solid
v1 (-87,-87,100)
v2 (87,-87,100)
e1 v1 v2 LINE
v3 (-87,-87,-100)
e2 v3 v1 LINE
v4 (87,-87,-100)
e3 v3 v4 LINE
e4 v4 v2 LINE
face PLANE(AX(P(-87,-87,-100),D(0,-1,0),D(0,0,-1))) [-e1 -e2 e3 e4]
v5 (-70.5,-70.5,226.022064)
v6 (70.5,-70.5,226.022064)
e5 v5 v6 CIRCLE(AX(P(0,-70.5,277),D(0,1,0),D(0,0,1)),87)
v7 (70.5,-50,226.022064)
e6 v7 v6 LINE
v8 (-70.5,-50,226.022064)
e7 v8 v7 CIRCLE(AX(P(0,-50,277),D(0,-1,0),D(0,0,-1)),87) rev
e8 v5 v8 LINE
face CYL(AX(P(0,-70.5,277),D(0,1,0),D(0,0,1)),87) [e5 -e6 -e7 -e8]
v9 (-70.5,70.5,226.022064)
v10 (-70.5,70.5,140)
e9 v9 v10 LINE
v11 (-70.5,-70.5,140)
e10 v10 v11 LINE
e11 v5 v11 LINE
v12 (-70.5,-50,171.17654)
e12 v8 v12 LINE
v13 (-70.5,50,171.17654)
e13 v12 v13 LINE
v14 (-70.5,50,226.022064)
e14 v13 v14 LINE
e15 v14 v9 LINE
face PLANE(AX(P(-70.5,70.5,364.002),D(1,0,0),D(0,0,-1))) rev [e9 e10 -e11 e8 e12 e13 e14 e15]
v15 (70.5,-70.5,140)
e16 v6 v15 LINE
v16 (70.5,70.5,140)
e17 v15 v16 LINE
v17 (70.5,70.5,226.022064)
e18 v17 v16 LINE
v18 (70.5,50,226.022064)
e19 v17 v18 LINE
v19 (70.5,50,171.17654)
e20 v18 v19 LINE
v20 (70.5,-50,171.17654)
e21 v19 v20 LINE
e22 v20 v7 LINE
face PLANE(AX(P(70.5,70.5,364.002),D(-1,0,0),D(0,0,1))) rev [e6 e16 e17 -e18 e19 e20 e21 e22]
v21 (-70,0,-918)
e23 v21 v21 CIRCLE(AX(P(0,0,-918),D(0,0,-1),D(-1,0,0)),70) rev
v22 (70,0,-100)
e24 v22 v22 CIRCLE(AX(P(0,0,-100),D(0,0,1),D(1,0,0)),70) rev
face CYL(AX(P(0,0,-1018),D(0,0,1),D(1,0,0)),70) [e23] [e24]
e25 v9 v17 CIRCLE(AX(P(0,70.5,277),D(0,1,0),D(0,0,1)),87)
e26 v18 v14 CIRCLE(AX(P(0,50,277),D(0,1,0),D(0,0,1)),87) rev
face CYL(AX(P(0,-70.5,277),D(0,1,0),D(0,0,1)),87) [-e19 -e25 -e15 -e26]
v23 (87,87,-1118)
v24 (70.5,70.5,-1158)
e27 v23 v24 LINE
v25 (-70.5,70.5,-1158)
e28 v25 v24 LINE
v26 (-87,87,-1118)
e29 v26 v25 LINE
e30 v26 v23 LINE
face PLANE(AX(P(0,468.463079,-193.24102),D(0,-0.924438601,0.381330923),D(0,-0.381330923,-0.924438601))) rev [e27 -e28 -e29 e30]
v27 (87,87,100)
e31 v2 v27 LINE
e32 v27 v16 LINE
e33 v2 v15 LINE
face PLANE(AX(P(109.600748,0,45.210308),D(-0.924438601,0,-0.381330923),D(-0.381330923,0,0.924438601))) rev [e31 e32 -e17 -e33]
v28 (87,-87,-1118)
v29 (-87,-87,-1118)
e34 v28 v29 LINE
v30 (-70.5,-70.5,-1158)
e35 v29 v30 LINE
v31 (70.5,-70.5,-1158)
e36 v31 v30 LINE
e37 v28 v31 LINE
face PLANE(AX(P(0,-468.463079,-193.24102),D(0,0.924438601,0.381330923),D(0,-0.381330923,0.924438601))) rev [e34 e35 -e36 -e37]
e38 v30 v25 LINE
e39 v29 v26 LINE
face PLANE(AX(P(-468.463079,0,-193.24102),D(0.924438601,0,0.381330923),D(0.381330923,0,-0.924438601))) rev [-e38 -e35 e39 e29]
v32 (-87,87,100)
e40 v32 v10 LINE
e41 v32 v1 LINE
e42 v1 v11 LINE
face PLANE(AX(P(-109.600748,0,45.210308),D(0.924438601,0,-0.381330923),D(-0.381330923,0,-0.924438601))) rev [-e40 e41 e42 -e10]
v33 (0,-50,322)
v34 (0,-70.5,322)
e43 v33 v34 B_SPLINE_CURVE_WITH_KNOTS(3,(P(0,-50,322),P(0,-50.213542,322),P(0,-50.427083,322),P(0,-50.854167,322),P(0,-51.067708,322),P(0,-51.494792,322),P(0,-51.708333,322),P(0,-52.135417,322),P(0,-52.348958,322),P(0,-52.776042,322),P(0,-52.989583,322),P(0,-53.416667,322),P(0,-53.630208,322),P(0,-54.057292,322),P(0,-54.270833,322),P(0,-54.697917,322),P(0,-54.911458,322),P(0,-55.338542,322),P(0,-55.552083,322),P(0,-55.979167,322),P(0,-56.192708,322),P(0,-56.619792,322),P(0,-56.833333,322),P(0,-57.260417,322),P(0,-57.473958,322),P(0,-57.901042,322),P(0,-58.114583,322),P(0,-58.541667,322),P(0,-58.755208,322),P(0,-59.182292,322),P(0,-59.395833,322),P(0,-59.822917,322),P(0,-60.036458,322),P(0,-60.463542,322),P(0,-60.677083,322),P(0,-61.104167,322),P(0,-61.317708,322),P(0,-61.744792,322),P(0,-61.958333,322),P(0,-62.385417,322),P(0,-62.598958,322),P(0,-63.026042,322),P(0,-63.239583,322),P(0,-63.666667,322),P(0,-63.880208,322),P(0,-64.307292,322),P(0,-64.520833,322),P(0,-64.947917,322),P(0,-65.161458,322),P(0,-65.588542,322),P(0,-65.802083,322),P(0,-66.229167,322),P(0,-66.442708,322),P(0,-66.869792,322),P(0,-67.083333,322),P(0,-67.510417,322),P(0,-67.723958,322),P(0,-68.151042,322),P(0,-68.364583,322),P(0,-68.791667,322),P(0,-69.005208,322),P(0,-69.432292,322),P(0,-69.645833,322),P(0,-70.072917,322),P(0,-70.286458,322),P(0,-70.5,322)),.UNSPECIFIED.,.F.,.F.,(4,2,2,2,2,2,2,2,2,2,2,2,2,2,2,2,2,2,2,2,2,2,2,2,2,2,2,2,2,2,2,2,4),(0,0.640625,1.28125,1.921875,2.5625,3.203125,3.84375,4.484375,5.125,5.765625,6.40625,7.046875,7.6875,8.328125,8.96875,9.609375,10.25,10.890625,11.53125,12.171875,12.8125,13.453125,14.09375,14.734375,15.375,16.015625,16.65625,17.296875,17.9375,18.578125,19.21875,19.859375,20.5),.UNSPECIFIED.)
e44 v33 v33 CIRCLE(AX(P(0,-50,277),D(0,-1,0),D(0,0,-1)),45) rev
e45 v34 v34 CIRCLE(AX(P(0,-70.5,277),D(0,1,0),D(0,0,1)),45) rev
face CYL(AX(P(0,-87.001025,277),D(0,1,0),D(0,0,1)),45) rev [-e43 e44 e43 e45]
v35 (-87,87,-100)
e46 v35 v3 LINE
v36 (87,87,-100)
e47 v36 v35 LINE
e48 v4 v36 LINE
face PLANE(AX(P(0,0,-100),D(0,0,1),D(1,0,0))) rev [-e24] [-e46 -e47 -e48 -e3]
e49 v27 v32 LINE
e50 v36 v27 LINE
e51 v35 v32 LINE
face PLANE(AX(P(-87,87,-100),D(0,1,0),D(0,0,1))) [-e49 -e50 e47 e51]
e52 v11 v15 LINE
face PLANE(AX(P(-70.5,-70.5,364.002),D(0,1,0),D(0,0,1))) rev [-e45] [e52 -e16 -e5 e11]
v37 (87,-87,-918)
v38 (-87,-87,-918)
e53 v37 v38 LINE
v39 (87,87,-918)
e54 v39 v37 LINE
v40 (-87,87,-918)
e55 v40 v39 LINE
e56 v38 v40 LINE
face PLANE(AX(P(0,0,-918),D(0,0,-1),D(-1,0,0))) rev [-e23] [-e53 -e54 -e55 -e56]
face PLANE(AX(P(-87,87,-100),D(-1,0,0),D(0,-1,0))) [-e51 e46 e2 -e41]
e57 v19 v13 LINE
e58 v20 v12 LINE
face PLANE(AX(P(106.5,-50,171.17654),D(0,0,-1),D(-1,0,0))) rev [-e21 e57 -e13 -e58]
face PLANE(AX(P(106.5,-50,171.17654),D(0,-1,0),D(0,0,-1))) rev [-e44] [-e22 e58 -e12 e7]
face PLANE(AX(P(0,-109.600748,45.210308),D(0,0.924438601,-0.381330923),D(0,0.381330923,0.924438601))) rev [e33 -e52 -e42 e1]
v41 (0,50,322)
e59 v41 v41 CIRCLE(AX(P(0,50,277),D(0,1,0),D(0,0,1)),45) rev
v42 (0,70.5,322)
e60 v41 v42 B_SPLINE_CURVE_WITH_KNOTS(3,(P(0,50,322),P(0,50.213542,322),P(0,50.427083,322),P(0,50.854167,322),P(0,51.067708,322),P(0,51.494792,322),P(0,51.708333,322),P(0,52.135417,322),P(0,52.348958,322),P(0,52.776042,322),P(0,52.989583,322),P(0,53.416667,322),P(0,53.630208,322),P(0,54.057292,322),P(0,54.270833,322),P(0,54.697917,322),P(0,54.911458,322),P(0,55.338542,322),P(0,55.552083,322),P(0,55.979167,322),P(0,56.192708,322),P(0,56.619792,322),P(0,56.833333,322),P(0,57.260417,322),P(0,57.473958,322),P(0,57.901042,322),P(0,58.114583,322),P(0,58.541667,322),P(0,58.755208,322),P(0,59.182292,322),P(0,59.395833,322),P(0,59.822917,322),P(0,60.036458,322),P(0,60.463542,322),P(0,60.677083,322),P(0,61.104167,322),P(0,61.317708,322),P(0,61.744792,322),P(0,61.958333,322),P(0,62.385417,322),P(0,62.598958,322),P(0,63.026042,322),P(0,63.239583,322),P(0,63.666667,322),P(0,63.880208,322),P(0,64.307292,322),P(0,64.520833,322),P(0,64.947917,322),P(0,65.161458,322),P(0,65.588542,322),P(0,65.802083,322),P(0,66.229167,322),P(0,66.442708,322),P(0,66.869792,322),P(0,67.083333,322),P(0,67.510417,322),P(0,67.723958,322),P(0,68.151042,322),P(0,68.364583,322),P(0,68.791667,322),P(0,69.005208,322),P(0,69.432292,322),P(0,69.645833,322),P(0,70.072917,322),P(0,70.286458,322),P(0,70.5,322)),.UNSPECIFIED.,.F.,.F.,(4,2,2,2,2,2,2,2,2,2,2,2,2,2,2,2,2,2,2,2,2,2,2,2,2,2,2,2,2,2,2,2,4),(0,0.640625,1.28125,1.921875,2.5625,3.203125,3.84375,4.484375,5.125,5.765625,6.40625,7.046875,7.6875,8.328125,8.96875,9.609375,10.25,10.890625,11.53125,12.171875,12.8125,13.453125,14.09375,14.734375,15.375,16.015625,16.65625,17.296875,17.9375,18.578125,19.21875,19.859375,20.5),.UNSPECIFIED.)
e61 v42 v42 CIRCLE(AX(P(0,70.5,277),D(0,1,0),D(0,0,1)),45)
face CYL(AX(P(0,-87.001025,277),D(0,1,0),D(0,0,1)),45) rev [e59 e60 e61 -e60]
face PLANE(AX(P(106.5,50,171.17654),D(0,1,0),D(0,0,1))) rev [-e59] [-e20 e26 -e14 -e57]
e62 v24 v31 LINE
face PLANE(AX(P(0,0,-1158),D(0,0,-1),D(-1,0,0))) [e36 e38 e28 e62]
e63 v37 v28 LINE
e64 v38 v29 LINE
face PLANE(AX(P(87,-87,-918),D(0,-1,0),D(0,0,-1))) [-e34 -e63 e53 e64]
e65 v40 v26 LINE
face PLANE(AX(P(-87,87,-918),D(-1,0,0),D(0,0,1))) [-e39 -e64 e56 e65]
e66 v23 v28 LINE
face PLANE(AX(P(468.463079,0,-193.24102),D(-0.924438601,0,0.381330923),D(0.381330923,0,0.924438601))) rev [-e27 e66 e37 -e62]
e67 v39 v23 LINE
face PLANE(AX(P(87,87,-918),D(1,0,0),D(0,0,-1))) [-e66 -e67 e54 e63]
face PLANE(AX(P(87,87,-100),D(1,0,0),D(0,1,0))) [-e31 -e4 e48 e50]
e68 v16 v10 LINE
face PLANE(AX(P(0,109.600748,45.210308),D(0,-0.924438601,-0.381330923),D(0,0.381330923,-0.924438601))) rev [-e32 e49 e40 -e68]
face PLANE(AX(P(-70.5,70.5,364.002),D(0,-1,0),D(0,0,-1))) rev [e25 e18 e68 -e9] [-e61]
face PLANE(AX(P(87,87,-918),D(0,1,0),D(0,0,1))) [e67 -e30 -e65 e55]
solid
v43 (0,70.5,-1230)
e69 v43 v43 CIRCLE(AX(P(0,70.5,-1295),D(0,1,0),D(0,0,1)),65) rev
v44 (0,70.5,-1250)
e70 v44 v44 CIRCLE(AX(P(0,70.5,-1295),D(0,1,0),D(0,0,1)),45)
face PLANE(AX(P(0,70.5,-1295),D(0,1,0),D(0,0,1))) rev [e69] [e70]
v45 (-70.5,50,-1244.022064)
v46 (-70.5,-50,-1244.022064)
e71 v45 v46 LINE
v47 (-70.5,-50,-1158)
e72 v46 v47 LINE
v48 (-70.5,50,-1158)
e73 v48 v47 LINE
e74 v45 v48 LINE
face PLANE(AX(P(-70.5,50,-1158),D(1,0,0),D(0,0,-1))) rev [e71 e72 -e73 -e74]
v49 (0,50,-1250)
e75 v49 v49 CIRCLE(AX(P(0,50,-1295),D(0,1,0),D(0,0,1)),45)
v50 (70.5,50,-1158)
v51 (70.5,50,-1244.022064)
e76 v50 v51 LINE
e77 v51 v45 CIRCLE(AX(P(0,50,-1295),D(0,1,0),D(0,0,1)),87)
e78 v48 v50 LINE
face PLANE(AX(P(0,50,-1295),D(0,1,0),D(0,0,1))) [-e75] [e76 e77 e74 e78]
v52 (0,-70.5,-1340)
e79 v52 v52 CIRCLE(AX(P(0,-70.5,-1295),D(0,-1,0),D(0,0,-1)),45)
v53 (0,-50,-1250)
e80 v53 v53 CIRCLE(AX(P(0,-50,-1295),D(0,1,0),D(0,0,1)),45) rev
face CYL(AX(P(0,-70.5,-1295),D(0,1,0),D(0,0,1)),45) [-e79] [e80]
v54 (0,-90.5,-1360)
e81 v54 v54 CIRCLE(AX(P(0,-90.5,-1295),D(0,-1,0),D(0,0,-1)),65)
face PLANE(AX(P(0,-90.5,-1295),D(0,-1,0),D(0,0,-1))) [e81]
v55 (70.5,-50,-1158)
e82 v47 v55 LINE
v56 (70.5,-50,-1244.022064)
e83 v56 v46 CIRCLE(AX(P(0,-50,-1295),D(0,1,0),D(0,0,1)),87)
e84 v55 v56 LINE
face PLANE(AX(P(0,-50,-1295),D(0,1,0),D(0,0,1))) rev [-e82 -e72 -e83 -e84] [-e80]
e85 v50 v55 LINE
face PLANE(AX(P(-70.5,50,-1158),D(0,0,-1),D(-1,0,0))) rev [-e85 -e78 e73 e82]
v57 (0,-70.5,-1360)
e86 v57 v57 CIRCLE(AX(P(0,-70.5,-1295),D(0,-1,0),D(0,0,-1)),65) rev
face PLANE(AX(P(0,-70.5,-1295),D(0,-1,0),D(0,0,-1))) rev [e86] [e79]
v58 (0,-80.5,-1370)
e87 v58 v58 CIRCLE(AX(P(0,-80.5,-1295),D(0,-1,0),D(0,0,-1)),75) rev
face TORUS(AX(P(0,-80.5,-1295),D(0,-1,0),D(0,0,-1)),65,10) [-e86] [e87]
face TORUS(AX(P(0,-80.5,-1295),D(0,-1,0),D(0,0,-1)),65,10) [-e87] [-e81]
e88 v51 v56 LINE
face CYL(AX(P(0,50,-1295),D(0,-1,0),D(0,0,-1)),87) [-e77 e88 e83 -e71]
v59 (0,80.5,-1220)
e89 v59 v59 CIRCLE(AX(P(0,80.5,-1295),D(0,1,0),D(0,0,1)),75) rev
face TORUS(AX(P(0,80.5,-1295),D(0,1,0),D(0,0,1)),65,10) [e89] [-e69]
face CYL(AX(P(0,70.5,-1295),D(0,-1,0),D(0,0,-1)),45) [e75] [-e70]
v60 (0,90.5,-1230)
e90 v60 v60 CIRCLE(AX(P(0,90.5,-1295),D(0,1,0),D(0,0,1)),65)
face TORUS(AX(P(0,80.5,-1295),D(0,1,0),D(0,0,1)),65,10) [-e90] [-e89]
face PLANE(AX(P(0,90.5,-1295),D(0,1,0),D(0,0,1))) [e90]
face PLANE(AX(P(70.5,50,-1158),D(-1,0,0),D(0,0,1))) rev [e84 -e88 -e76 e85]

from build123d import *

# Parameters (mm, degrees)
SKETCH2_R                = 70
BOSS_EXTRUDE2_DEPTH      = 1018
SKETCH4_W                = 174
SKETCH4_H                = 174
BOSS_EXTRUDE3_DEPTH      = 100
SKETCH7_W                = 174
SKETCH7_H                = 174
BOSS_EXTRUDE4_DEPTH      = 100
SKETCH14_R               = 87
BOSS_EXTRUDE5_DEPTH      = 141
SKETCH16_R               = 45
CUT_EXTRUDE1_DEPTH       = 141
BOSS_EXTRUDE6_REACH      = 1305.818
BOSS_EXTRUDE6_END_RADIUS = 87
SKETCH17_W               = 141
SKETCH17_H               = 141
SKETCH23_W               = 196.221845396
SKETCH23_H               = 100
CUT_EXTRUDE2_DEPTH       = 201
BOSS_EXTRUDE7_DEPTH      = 50
SKETCH26_R               = 45
BOSS_EXTRUDE8_DEPTH      = 20.5
SKETCH27_R               = 45
BOSS_EXTRUDE9_DEPTH      = 20.5
SKETCH28_R               = 75
BOSS_EXTRUDE10_DEPTH     = 20
FILLET1_R                = 10
SKETCH29_R               = 75
BOSS_EXTRUDE11_DEPTH     = 20
FILLET2_R                = 10


with BuildPart() as part:
    # Sketch2 → Boss-Extrude2 (new body)
    with BuildSketch(Plane.XY):
        Circle(SKETCH2_R)
    extrude(amount=-BOSS_EXTRUDE2_DEPTH)

    # Sketch4 → Boss-Extrude3 (add, symmetric)
    with BuildSketch(Plane.XY):
        Rectangle(SKETCH4_W, SKETCH4_H)
    extrude(amount=BOSS_EXTRUDE3_DEPTH, both=True)

    # Sketch7 → Boss-Extrude4 (add, symmetric)
    with BuildSketch(Plane(origin=(0, 0, -1018), x_dir=(-1, 0, 0), z_dir=(0, 0, -1))):
        Rectangle(SKETCH7_W, SKETCH7_H)
    extrude(amount=BOSS_EXTRUDE4_DEPTH, both=True)

    # Sketch8 → section 1 of loft1
    with BuildSketch(Plane.XY.offset(140), mode=Mode.PRIVATE) as loft1_s1:
        with BuildLine():
            Line((-70.5, 70.5), (70.5, 70.5))
            Line((70.5, 70.5), (70.5, -70.5))
            Line((70.5, -70.5), (-70.5, -70.5))
            Line((-70.5, -70.5), (-70.5, 70.5))
        make_face()
    # loft from a face of the part (loft1)
    loft([part.faces().sort_by_distance((0, 0, 100))[0], loft1_s1.sketch])

    # Sketch10 → section 1 of loft8
    with BuildSketch(Plane(origin=(0, 0, -1158), x_dir=(-1, 0, 0), z_dir=(0, 0, -1)), mode=Mode.PRIVATE) as loft8_s1:
        with BuildLine():
            Line((-70.5, 70.5), (70.5, 70.5))
            Line((70.5, 70.5), (70.5, -70.5))
            Line((70.5, -70.5), (-70.5, -70.5))
            Line((-70.5, -70.5), (-70.5, 70.5))
        make_face()
    # loft from a face of the part (loft8)
    loft([part.faces().sort_by_distance((0, 0, -1118))[0], loft8_s1.sketch])



with BuildPart() as body_2:
    # Sketch14 → Boss-Extrude5 (new body)
    with BuildSketch(Plane(origin=(0, 70.5, 0), x_dir=(-1, 0, 0), z_dir=(0, 1, 0))):
        with Locations(Location((0, 277, 0), (0, 0, 90))):
            Circle(SKETCH14_R)
    extrude(amount=-BOSS_EXTRUDE5_DEPTH)

    # Sketch16 → Cut-Extrude1 (cut)
    with BuildSketch(Plane(origin=(0, 70.5, 0), x_dir=(1, 0, 0), z_dir=(0, 1, 0))):
        with Locations(Location((0, -277, 0), (0, 0, 270))):
            Circle(SKETCH16_R)
    extrude(amount=-CUT_EXTRUDE1_DEPTH, mode=Mode.SUBTRACT)


with BuildPart() as part_1:
    add(part.part)

    add(body_2.part)  # Boss-Extrude6 merges body 2
    # Boss-Extrude6: up to this cylinder (the profile starts outside it)
    boss_extrude6_end = Plane(origin=(0, 0, 277), z_dir=(0, 1, 0)) * Cylinder(BOSS_EXTRUDE6_END_RADIUS, 2786.636, mode=Mode.PRIVATE)
    # Sketch17 → Boss-Extrude6 (add, up to the surface)
    with BuildSketch(Plane.XY.offset(140), mode=Mode.PRIVATE) as boss_extrude6_sk1:
        Rectangle(SKETCH17_W, SKETCH17_H)
    boss_extrude6_tool1 = extrude(boss_extrude6_sk1.sketch, amount=BOSS_EXTRUDE6_REACH, mode=Mode.PRIVATE) - boss_extrude6_end
    add(boss_extrude6_tool1.solids().sort_by_distance((0, 0, 140))[0])

    # Sketch23 → Cut-Extrude2 (cut)
    with BuildSketch(Plane.ZY.offset(94.5)):
        with Locations((269.287462291, 0)):
            Rectangle(SKETCH23_W, SKETCH23_H)
    extrude(amount=-CUT_EXTRUDE2_DEPTH, mode=Mode.SUBTRACT)


with BuildPart() as body_2_2:
    # Sketch24 → Boss-Extrude7 (new, symmetric)
    with BuildSketch(Plane(origin=(0, 0, 0), x_dir=(1, 0, 0), z_dir=(0, 1, 0))):
        with BuildLine():
            Line((-70.5, 1158), (70.5, 1158))
            Line((70.5, 1158), (70.5, 1244.022063596))
            ThreePointArc((70.5, 1244.022063596), (0, 1382), (-70.5, 1244.022063596))
            Line((-70.5, 1244.022063596), (-70.5, 1158))
        make_face()
    extrude(amount=BOSS_EXTRUDE7_DEPTH, both=True)

    # Sketch26 → Boss-Extrude8 (add)
    with BuildSketch(Plane(origin=(0, 50, 0), x_dir=(1, 0, 0), z_dir=(0, 1, 0))):
        with Locations(Location((0, 1295, 0), (0, 0, 270))):
            Circle(SKETCH26_R)
    extrude(amount=BOSS_EXTRUDE8_DEPTH)

    # Sketch27 → Boss-Extrude9 (add)
    with BuildSketch(Plane.XZ.offset(50)):
        with Locations(Location((0, -1295, 0), (0, 0, 90))):
            Circle(SKETCH27_R)
    extrude(amount=BOSS_EXTRUDE9_DEPTH)

    # Sketch28 → Boss-Extrude10 (add)
    with BuildSketch(Plane.XZ.offset(70.5)):
        with Locations(Location((0, -1295, 0), (0, 0, 270))):
            Circle(SKETCH28_R)
    extrude(amount=BOSS_EXTRUDE10_DEPTH)

    # Fillet1
    fillet1_edges = [body_2_2.edges().sort_by_distance(p)[0] for p in [
        (0, -70.5, -1220),
        (0, -90.5, -1220),
    ]]
    fillet(fillet1_edges, radius=FILLET1_R - 0.0001)  # a hair under: the kernel refuses the full size

    # Sketch29 → Boss-Extrude11 (add)
    with BuildSketch(Plane(origin=(0, 70.5, 0), x_dir=(1, 0, 0), z_dir=(0, 1, 0))):
        with Locations(Location((0, 1295, 0), (0, 0, 270))):
            Circle(SKETCH29_R)
    extrude(amount=BOSS_EXTRUDE11_DEPTH)

    # Fillet2
    fillet2_edges = [body_2_2.edges().sort_by_distance(p)[0] for p in [
        (0, 70.5, -1370),
        (0, 90.5, -1370),
    ]]
    fillet(fillet2_edges, radius=FILLET2_R - 0.0001)  # a hair under: the kernel refuses the full size


solid = Compound([part_1.part, body_2_2.part])
